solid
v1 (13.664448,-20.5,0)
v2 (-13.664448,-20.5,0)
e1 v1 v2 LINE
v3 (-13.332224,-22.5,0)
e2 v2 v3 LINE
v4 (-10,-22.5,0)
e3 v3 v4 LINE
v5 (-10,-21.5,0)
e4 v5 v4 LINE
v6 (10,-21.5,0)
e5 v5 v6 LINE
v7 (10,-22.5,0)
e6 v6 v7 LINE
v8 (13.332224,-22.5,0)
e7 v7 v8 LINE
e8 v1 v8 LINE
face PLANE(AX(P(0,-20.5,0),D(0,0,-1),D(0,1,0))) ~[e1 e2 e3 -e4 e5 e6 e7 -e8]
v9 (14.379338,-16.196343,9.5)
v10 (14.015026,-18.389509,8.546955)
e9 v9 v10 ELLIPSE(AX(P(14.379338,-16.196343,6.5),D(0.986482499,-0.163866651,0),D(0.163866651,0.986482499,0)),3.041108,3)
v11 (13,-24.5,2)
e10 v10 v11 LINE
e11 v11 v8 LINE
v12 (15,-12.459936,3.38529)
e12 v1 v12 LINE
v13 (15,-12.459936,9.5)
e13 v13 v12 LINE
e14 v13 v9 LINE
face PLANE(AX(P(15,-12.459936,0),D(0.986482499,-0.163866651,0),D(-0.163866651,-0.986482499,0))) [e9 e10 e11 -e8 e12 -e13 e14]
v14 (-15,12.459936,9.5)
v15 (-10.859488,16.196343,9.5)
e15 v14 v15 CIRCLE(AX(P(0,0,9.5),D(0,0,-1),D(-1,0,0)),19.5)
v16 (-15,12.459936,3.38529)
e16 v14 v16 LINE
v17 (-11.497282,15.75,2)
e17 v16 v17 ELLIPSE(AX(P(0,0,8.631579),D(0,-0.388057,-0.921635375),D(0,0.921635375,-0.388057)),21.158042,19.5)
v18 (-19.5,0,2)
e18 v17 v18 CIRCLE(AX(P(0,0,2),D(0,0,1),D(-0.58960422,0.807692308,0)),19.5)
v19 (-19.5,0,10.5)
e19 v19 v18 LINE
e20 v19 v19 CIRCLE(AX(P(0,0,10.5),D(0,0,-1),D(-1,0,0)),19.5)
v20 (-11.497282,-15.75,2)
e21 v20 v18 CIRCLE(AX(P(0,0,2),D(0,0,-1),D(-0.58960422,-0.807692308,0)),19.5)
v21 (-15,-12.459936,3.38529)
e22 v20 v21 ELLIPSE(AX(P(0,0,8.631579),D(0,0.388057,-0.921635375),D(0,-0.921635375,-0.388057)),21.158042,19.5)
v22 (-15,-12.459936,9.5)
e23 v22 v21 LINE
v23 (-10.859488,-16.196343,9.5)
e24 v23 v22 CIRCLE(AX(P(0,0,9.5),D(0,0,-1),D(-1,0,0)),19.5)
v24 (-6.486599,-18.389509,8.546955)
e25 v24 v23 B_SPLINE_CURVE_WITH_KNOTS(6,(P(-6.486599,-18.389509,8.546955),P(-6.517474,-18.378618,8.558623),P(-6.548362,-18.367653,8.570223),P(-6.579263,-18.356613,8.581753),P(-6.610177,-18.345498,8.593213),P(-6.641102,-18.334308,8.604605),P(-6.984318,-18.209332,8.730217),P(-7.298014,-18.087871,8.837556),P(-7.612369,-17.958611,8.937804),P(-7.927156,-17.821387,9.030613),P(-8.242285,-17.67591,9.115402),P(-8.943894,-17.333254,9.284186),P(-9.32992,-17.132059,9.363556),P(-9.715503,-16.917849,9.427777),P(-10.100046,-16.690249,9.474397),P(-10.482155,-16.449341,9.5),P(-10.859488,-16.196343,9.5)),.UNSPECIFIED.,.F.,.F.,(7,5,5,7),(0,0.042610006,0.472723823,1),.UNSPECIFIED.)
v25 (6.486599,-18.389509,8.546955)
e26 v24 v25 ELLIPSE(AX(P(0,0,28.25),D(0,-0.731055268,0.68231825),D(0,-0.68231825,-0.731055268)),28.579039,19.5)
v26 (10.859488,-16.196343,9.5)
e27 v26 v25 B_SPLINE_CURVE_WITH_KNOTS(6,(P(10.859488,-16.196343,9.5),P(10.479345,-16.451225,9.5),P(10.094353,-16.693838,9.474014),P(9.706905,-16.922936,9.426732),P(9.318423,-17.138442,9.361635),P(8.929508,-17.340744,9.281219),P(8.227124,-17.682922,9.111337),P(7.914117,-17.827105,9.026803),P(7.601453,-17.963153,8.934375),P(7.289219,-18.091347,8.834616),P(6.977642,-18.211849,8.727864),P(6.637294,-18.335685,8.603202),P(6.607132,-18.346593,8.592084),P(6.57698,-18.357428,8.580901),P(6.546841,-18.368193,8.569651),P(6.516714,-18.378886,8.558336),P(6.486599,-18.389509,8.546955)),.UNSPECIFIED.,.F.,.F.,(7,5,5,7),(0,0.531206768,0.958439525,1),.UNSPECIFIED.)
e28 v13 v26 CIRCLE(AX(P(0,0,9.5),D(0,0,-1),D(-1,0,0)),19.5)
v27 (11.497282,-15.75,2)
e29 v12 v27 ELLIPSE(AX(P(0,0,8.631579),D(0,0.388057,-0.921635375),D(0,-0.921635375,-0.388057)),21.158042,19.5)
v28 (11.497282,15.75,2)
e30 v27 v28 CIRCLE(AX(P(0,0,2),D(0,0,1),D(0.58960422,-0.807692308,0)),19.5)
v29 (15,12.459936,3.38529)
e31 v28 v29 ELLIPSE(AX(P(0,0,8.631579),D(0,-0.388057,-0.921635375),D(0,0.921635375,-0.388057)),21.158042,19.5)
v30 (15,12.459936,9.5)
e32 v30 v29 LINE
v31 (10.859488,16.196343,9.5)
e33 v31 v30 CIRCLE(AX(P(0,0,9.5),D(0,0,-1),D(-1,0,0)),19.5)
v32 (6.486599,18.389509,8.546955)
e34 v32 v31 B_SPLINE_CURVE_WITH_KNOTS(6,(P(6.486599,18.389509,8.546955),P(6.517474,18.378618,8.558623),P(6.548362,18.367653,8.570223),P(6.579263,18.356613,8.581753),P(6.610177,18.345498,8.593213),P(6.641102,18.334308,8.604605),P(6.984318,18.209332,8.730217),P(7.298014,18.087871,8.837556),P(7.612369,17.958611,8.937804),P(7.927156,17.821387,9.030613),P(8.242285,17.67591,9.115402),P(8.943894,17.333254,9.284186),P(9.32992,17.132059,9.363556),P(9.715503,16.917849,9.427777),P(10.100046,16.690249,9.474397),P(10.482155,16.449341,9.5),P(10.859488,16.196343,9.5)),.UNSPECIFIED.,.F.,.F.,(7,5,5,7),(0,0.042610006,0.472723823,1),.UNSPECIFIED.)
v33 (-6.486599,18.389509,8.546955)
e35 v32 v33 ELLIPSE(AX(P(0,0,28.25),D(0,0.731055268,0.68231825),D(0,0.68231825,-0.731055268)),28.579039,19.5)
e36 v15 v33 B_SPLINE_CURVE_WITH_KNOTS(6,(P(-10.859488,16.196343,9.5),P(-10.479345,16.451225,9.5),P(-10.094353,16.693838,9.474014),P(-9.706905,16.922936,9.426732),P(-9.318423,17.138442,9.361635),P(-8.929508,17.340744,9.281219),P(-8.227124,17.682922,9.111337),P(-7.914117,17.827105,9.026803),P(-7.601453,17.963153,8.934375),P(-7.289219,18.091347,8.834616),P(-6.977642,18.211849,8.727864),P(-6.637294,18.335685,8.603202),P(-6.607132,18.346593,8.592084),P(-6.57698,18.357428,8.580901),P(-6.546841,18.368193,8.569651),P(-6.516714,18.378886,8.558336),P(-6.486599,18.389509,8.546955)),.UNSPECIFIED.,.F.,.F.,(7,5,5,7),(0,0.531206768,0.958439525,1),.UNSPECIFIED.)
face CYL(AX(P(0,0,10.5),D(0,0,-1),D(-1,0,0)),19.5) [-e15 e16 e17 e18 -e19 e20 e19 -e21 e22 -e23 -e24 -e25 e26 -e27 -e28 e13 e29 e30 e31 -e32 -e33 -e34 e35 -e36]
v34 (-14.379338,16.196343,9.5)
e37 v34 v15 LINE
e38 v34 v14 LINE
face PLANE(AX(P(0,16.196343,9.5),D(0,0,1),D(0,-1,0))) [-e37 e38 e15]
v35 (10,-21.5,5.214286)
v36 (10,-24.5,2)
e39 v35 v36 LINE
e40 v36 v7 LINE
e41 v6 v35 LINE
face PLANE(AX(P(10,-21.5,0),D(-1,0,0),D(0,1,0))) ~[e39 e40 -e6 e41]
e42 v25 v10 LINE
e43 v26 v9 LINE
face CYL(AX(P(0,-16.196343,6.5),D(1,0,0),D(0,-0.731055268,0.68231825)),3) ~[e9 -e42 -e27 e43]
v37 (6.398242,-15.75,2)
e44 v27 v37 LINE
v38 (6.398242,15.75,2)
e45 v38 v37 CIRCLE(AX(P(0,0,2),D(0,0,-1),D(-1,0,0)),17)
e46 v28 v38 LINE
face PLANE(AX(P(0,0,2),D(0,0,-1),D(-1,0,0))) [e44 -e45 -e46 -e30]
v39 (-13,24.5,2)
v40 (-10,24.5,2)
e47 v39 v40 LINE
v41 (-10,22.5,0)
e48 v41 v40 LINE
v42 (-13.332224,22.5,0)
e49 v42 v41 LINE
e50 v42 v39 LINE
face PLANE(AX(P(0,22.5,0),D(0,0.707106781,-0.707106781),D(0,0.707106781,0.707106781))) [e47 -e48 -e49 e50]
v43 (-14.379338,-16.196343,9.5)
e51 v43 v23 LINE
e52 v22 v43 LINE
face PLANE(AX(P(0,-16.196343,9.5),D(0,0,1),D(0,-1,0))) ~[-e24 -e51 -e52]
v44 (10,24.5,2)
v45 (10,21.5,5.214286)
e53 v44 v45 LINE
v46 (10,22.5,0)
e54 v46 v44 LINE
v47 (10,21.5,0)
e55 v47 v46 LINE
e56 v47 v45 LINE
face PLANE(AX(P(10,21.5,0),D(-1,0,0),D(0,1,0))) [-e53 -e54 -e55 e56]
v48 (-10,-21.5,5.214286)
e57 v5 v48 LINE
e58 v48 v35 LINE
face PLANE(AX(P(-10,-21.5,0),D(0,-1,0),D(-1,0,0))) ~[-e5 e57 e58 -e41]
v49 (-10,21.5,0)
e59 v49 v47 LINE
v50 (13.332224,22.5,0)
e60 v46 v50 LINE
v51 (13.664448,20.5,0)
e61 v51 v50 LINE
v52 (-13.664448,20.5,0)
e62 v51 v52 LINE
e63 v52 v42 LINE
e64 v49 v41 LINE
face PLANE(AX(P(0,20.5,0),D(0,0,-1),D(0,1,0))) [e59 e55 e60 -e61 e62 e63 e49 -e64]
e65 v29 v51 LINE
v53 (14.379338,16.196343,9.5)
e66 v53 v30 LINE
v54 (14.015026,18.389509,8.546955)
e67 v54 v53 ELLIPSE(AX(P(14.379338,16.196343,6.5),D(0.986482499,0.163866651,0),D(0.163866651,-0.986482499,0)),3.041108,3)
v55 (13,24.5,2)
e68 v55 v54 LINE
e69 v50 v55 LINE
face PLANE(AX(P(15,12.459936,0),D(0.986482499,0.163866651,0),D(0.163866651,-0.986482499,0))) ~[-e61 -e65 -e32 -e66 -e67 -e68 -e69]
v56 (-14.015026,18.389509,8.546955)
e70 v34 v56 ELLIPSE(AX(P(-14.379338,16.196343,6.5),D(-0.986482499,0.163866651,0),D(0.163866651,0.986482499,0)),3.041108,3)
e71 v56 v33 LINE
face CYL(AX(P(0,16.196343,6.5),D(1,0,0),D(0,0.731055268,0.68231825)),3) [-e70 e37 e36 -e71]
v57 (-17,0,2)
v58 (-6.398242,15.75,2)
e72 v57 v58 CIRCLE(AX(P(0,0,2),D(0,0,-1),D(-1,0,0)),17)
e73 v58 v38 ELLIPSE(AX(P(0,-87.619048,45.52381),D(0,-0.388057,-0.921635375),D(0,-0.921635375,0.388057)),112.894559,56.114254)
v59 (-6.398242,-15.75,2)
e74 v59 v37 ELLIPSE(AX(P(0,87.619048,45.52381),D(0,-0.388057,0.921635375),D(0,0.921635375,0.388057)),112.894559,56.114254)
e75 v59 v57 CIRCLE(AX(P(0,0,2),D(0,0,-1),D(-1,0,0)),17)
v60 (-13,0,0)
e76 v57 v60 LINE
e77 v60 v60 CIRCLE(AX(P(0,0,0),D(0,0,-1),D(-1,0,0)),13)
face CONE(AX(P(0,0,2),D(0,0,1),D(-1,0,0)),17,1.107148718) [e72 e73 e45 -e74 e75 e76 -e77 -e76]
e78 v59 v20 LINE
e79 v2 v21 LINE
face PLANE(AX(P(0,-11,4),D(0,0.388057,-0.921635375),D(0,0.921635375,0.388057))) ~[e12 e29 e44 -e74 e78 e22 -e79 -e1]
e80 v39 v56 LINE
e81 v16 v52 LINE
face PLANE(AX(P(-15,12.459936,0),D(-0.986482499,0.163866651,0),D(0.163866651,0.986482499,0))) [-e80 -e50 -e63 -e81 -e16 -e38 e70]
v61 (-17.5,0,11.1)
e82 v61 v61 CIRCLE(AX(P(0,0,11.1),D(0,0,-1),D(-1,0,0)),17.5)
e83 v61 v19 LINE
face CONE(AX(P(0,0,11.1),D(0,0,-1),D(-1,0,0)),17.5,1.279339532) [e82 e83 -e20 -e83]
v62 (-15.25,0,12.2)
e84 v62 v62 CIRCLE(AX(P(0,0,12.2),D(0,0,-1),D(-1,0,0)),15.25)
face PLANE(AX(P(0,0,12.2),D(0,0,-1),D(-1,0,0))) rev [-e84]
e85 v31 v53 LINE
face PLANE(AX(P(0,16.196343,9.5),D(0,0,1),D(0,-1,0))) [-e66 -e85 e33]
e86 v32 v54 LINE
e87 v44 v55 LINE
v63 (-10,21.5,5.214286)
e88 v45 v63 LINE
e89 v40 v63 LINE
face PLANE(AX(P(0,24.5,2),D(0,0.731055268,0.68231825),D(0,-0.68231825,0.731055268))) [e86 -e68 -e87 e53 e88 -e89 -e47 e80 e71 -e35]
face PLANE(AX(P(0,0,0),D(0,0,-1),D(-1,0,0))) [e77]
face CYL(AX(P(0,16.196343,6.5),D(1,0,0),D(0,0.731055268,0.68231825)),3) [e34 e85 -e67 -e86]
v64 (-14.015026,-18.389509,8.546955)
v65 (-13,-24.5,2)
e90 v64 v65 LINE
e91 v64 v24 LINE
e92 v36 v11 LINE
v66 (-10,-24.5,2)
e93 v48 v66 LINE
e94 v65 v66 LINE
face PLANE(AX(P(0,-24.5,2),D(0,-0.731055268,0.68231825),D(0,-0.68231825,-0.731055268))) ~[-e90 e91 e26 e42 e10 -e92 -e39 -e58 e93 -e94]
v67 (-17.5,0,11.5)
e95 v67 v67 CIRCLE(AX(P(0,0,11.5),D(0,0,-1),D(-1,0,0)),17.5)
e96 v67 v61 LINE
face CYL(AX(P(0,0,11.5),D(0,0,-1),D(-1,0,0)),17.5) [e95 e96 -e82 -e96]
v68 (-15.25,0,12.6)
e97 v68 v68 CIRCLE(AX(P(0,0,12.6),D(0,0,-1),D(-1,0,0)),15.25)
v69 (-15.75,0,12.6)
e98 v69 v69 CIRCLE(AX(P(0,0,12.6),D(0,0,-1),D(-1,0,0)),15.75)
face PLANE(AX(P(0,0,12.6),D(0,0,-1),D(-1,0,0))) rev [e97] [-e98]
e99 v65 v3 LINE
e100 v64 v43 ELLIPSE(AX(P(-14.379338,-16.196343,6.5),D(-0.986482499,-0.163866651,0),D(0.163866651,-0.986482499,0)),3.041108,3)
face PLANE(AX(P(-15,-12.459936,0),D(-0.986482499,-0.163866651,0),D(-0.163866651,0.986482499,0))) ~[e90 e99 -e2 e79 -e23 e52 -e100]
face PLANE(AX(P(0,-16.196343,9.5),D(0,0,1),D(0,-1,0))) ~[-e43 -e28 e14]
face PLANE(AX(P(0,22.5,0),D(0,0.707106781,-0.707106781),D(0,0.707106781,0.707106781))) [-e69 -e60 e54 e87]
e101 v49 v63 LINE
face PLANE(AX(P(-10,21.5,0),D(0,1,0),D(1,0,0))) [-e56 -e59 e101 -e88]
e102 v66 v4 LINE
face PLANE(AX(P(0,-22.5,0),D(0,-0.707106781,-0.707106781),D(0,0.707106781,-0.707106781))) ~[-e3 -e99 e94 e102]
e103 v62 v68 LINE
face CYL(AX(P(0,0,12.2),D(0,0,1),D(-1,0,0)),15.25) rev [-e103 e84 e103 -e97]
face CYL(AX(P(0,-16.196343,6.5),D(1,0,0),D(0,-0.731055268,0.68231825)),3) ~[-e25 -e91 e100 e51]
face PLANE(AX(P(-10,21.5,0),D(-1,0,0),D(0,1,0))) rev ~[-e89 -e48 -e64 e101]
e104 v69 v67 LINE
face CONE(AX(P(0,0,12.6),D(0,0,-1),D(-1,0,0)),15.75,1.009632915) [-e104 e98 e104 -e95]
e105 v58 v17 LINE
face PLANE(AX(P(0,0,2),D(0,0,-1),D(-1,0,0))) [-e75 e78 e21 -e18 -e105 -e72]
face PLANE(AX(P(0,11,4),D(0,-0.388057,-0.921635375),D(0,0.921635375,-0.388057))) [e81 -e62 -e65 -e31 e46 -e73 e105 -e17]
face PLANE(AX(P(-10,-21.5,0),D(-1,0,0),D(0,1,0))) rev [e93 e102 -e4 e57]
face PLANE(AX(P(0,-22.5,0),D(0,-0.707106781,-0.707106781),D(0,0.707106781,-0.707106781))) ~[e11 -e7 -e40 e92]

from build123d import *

# Parameters (mm, degrees)
F3_DEPTH         = 15
F5_DEPTH         = 12.601
F5_COPIES2_COUNT = 2
F6_W             = 20
F6_H             = 3
F7_DEPTH         = 12.601


# Not quite as in the source:
# - a pattern or mirror of a feature is missing from the dataset's text; its kind, count and spacing are read off the source's solid


with BuildPart() as f1:
    # F0 (on Front) → F1 (revolve)
    with BuildSketch(Plane.XZ):
        Polygon((-13, 0), (0, 0), (0, 12.2), (-15.25, 12.2), (-15.25, 12.6), (-15.75, 12.6), (-17.5, 11.5), (-17.5, 11.1), (-19.5, 10.5), (-19.5, 2), (-17, 2), align=None)
    revolve(axis=Axis((0, 0, 3.4052523688), (0, 0, -1)))

    # F2 (on Right) → F3 (join, symmetric)
    with BuildSketch(Plane.YZ):
        with BuildLine():
            Line((20.5, 0), (22.5, 0))
            Line((22.5, 0), (24.5, 2))
            Line((24.5, 2), (18.389508899, 8.5469547511))
            ThreePointArc((18.389508899, 8.5469547511), (17.3919884737, 9.2514418269), (16.1963430943, 9.5))
            Line((16.1963430943, 9.5), (11, 9.5))
            Line((11, 9.5), (11, 4))
            Line((11, 4), (20.5, 0))
        make_face()
    f3 = extrude(amount=F3_DEPTH, both=True)

    # F3_copies: F3 across plane
    add(f3.mirror(Plane(origin=(0, 0, 0), x_dir=(0, 0, -1), z_dir=(0, -1, 0))))

    # F4 (on Top) → F5 (cut, through all)
    with BuildSketch(Plane.XY):
        Polygon((-15, 24.5), (-15, 12.4599357944), (-13, 24.5), align=None)
    f5 = extrude(amount=F5_DEPTH, mode=Mode.SUBTRACT)

    # F5_copies: F5 across plane
    add(f5.mirror(Plane(origin=(0, 0, 0), x_dir=(0, 0, 1), z_dir=(1, 0, 0))), mode=Mode.SUBTRACT)

    # F5_copies1: F5 across plane
    add(f5.mirror(Plane(origin=(0, 0, 0), x_dir=(0, 0, -1), z_dir=(0, -1, 0))), mode=Mode.SUBTRACT)

    # F5_copies2: F5 ×2 about axis
    f5_copies2_axis = Axis((0, 0, 0), (0, 0, 1))
    for i in range(1, F5_COPIES2_COUNT):
        add(f5.rotate(f5_copies2_axis, i * 360 / F5_COPIES2_COUNT), mode=Mode.SUBTRACT)

    # F6 (on Top) → F7 (cut, through all)
    with BuildSketch(Plane.XY):
        with Locations((0, 23)):
            Rectangle(F6_W, F6_H)
    f7 = extrude(amount=F7_DEPTH, mode=Mode.SUBTRACT)

    # F7_copies: F7 across plane
    add(f7.mirror(Plane(origin=(0, 0, 0), x_dir=(0, 0, -1), z_dir=(0, -1, 0))), mode=Mode.SUBTRACT)


solid = f1.part
